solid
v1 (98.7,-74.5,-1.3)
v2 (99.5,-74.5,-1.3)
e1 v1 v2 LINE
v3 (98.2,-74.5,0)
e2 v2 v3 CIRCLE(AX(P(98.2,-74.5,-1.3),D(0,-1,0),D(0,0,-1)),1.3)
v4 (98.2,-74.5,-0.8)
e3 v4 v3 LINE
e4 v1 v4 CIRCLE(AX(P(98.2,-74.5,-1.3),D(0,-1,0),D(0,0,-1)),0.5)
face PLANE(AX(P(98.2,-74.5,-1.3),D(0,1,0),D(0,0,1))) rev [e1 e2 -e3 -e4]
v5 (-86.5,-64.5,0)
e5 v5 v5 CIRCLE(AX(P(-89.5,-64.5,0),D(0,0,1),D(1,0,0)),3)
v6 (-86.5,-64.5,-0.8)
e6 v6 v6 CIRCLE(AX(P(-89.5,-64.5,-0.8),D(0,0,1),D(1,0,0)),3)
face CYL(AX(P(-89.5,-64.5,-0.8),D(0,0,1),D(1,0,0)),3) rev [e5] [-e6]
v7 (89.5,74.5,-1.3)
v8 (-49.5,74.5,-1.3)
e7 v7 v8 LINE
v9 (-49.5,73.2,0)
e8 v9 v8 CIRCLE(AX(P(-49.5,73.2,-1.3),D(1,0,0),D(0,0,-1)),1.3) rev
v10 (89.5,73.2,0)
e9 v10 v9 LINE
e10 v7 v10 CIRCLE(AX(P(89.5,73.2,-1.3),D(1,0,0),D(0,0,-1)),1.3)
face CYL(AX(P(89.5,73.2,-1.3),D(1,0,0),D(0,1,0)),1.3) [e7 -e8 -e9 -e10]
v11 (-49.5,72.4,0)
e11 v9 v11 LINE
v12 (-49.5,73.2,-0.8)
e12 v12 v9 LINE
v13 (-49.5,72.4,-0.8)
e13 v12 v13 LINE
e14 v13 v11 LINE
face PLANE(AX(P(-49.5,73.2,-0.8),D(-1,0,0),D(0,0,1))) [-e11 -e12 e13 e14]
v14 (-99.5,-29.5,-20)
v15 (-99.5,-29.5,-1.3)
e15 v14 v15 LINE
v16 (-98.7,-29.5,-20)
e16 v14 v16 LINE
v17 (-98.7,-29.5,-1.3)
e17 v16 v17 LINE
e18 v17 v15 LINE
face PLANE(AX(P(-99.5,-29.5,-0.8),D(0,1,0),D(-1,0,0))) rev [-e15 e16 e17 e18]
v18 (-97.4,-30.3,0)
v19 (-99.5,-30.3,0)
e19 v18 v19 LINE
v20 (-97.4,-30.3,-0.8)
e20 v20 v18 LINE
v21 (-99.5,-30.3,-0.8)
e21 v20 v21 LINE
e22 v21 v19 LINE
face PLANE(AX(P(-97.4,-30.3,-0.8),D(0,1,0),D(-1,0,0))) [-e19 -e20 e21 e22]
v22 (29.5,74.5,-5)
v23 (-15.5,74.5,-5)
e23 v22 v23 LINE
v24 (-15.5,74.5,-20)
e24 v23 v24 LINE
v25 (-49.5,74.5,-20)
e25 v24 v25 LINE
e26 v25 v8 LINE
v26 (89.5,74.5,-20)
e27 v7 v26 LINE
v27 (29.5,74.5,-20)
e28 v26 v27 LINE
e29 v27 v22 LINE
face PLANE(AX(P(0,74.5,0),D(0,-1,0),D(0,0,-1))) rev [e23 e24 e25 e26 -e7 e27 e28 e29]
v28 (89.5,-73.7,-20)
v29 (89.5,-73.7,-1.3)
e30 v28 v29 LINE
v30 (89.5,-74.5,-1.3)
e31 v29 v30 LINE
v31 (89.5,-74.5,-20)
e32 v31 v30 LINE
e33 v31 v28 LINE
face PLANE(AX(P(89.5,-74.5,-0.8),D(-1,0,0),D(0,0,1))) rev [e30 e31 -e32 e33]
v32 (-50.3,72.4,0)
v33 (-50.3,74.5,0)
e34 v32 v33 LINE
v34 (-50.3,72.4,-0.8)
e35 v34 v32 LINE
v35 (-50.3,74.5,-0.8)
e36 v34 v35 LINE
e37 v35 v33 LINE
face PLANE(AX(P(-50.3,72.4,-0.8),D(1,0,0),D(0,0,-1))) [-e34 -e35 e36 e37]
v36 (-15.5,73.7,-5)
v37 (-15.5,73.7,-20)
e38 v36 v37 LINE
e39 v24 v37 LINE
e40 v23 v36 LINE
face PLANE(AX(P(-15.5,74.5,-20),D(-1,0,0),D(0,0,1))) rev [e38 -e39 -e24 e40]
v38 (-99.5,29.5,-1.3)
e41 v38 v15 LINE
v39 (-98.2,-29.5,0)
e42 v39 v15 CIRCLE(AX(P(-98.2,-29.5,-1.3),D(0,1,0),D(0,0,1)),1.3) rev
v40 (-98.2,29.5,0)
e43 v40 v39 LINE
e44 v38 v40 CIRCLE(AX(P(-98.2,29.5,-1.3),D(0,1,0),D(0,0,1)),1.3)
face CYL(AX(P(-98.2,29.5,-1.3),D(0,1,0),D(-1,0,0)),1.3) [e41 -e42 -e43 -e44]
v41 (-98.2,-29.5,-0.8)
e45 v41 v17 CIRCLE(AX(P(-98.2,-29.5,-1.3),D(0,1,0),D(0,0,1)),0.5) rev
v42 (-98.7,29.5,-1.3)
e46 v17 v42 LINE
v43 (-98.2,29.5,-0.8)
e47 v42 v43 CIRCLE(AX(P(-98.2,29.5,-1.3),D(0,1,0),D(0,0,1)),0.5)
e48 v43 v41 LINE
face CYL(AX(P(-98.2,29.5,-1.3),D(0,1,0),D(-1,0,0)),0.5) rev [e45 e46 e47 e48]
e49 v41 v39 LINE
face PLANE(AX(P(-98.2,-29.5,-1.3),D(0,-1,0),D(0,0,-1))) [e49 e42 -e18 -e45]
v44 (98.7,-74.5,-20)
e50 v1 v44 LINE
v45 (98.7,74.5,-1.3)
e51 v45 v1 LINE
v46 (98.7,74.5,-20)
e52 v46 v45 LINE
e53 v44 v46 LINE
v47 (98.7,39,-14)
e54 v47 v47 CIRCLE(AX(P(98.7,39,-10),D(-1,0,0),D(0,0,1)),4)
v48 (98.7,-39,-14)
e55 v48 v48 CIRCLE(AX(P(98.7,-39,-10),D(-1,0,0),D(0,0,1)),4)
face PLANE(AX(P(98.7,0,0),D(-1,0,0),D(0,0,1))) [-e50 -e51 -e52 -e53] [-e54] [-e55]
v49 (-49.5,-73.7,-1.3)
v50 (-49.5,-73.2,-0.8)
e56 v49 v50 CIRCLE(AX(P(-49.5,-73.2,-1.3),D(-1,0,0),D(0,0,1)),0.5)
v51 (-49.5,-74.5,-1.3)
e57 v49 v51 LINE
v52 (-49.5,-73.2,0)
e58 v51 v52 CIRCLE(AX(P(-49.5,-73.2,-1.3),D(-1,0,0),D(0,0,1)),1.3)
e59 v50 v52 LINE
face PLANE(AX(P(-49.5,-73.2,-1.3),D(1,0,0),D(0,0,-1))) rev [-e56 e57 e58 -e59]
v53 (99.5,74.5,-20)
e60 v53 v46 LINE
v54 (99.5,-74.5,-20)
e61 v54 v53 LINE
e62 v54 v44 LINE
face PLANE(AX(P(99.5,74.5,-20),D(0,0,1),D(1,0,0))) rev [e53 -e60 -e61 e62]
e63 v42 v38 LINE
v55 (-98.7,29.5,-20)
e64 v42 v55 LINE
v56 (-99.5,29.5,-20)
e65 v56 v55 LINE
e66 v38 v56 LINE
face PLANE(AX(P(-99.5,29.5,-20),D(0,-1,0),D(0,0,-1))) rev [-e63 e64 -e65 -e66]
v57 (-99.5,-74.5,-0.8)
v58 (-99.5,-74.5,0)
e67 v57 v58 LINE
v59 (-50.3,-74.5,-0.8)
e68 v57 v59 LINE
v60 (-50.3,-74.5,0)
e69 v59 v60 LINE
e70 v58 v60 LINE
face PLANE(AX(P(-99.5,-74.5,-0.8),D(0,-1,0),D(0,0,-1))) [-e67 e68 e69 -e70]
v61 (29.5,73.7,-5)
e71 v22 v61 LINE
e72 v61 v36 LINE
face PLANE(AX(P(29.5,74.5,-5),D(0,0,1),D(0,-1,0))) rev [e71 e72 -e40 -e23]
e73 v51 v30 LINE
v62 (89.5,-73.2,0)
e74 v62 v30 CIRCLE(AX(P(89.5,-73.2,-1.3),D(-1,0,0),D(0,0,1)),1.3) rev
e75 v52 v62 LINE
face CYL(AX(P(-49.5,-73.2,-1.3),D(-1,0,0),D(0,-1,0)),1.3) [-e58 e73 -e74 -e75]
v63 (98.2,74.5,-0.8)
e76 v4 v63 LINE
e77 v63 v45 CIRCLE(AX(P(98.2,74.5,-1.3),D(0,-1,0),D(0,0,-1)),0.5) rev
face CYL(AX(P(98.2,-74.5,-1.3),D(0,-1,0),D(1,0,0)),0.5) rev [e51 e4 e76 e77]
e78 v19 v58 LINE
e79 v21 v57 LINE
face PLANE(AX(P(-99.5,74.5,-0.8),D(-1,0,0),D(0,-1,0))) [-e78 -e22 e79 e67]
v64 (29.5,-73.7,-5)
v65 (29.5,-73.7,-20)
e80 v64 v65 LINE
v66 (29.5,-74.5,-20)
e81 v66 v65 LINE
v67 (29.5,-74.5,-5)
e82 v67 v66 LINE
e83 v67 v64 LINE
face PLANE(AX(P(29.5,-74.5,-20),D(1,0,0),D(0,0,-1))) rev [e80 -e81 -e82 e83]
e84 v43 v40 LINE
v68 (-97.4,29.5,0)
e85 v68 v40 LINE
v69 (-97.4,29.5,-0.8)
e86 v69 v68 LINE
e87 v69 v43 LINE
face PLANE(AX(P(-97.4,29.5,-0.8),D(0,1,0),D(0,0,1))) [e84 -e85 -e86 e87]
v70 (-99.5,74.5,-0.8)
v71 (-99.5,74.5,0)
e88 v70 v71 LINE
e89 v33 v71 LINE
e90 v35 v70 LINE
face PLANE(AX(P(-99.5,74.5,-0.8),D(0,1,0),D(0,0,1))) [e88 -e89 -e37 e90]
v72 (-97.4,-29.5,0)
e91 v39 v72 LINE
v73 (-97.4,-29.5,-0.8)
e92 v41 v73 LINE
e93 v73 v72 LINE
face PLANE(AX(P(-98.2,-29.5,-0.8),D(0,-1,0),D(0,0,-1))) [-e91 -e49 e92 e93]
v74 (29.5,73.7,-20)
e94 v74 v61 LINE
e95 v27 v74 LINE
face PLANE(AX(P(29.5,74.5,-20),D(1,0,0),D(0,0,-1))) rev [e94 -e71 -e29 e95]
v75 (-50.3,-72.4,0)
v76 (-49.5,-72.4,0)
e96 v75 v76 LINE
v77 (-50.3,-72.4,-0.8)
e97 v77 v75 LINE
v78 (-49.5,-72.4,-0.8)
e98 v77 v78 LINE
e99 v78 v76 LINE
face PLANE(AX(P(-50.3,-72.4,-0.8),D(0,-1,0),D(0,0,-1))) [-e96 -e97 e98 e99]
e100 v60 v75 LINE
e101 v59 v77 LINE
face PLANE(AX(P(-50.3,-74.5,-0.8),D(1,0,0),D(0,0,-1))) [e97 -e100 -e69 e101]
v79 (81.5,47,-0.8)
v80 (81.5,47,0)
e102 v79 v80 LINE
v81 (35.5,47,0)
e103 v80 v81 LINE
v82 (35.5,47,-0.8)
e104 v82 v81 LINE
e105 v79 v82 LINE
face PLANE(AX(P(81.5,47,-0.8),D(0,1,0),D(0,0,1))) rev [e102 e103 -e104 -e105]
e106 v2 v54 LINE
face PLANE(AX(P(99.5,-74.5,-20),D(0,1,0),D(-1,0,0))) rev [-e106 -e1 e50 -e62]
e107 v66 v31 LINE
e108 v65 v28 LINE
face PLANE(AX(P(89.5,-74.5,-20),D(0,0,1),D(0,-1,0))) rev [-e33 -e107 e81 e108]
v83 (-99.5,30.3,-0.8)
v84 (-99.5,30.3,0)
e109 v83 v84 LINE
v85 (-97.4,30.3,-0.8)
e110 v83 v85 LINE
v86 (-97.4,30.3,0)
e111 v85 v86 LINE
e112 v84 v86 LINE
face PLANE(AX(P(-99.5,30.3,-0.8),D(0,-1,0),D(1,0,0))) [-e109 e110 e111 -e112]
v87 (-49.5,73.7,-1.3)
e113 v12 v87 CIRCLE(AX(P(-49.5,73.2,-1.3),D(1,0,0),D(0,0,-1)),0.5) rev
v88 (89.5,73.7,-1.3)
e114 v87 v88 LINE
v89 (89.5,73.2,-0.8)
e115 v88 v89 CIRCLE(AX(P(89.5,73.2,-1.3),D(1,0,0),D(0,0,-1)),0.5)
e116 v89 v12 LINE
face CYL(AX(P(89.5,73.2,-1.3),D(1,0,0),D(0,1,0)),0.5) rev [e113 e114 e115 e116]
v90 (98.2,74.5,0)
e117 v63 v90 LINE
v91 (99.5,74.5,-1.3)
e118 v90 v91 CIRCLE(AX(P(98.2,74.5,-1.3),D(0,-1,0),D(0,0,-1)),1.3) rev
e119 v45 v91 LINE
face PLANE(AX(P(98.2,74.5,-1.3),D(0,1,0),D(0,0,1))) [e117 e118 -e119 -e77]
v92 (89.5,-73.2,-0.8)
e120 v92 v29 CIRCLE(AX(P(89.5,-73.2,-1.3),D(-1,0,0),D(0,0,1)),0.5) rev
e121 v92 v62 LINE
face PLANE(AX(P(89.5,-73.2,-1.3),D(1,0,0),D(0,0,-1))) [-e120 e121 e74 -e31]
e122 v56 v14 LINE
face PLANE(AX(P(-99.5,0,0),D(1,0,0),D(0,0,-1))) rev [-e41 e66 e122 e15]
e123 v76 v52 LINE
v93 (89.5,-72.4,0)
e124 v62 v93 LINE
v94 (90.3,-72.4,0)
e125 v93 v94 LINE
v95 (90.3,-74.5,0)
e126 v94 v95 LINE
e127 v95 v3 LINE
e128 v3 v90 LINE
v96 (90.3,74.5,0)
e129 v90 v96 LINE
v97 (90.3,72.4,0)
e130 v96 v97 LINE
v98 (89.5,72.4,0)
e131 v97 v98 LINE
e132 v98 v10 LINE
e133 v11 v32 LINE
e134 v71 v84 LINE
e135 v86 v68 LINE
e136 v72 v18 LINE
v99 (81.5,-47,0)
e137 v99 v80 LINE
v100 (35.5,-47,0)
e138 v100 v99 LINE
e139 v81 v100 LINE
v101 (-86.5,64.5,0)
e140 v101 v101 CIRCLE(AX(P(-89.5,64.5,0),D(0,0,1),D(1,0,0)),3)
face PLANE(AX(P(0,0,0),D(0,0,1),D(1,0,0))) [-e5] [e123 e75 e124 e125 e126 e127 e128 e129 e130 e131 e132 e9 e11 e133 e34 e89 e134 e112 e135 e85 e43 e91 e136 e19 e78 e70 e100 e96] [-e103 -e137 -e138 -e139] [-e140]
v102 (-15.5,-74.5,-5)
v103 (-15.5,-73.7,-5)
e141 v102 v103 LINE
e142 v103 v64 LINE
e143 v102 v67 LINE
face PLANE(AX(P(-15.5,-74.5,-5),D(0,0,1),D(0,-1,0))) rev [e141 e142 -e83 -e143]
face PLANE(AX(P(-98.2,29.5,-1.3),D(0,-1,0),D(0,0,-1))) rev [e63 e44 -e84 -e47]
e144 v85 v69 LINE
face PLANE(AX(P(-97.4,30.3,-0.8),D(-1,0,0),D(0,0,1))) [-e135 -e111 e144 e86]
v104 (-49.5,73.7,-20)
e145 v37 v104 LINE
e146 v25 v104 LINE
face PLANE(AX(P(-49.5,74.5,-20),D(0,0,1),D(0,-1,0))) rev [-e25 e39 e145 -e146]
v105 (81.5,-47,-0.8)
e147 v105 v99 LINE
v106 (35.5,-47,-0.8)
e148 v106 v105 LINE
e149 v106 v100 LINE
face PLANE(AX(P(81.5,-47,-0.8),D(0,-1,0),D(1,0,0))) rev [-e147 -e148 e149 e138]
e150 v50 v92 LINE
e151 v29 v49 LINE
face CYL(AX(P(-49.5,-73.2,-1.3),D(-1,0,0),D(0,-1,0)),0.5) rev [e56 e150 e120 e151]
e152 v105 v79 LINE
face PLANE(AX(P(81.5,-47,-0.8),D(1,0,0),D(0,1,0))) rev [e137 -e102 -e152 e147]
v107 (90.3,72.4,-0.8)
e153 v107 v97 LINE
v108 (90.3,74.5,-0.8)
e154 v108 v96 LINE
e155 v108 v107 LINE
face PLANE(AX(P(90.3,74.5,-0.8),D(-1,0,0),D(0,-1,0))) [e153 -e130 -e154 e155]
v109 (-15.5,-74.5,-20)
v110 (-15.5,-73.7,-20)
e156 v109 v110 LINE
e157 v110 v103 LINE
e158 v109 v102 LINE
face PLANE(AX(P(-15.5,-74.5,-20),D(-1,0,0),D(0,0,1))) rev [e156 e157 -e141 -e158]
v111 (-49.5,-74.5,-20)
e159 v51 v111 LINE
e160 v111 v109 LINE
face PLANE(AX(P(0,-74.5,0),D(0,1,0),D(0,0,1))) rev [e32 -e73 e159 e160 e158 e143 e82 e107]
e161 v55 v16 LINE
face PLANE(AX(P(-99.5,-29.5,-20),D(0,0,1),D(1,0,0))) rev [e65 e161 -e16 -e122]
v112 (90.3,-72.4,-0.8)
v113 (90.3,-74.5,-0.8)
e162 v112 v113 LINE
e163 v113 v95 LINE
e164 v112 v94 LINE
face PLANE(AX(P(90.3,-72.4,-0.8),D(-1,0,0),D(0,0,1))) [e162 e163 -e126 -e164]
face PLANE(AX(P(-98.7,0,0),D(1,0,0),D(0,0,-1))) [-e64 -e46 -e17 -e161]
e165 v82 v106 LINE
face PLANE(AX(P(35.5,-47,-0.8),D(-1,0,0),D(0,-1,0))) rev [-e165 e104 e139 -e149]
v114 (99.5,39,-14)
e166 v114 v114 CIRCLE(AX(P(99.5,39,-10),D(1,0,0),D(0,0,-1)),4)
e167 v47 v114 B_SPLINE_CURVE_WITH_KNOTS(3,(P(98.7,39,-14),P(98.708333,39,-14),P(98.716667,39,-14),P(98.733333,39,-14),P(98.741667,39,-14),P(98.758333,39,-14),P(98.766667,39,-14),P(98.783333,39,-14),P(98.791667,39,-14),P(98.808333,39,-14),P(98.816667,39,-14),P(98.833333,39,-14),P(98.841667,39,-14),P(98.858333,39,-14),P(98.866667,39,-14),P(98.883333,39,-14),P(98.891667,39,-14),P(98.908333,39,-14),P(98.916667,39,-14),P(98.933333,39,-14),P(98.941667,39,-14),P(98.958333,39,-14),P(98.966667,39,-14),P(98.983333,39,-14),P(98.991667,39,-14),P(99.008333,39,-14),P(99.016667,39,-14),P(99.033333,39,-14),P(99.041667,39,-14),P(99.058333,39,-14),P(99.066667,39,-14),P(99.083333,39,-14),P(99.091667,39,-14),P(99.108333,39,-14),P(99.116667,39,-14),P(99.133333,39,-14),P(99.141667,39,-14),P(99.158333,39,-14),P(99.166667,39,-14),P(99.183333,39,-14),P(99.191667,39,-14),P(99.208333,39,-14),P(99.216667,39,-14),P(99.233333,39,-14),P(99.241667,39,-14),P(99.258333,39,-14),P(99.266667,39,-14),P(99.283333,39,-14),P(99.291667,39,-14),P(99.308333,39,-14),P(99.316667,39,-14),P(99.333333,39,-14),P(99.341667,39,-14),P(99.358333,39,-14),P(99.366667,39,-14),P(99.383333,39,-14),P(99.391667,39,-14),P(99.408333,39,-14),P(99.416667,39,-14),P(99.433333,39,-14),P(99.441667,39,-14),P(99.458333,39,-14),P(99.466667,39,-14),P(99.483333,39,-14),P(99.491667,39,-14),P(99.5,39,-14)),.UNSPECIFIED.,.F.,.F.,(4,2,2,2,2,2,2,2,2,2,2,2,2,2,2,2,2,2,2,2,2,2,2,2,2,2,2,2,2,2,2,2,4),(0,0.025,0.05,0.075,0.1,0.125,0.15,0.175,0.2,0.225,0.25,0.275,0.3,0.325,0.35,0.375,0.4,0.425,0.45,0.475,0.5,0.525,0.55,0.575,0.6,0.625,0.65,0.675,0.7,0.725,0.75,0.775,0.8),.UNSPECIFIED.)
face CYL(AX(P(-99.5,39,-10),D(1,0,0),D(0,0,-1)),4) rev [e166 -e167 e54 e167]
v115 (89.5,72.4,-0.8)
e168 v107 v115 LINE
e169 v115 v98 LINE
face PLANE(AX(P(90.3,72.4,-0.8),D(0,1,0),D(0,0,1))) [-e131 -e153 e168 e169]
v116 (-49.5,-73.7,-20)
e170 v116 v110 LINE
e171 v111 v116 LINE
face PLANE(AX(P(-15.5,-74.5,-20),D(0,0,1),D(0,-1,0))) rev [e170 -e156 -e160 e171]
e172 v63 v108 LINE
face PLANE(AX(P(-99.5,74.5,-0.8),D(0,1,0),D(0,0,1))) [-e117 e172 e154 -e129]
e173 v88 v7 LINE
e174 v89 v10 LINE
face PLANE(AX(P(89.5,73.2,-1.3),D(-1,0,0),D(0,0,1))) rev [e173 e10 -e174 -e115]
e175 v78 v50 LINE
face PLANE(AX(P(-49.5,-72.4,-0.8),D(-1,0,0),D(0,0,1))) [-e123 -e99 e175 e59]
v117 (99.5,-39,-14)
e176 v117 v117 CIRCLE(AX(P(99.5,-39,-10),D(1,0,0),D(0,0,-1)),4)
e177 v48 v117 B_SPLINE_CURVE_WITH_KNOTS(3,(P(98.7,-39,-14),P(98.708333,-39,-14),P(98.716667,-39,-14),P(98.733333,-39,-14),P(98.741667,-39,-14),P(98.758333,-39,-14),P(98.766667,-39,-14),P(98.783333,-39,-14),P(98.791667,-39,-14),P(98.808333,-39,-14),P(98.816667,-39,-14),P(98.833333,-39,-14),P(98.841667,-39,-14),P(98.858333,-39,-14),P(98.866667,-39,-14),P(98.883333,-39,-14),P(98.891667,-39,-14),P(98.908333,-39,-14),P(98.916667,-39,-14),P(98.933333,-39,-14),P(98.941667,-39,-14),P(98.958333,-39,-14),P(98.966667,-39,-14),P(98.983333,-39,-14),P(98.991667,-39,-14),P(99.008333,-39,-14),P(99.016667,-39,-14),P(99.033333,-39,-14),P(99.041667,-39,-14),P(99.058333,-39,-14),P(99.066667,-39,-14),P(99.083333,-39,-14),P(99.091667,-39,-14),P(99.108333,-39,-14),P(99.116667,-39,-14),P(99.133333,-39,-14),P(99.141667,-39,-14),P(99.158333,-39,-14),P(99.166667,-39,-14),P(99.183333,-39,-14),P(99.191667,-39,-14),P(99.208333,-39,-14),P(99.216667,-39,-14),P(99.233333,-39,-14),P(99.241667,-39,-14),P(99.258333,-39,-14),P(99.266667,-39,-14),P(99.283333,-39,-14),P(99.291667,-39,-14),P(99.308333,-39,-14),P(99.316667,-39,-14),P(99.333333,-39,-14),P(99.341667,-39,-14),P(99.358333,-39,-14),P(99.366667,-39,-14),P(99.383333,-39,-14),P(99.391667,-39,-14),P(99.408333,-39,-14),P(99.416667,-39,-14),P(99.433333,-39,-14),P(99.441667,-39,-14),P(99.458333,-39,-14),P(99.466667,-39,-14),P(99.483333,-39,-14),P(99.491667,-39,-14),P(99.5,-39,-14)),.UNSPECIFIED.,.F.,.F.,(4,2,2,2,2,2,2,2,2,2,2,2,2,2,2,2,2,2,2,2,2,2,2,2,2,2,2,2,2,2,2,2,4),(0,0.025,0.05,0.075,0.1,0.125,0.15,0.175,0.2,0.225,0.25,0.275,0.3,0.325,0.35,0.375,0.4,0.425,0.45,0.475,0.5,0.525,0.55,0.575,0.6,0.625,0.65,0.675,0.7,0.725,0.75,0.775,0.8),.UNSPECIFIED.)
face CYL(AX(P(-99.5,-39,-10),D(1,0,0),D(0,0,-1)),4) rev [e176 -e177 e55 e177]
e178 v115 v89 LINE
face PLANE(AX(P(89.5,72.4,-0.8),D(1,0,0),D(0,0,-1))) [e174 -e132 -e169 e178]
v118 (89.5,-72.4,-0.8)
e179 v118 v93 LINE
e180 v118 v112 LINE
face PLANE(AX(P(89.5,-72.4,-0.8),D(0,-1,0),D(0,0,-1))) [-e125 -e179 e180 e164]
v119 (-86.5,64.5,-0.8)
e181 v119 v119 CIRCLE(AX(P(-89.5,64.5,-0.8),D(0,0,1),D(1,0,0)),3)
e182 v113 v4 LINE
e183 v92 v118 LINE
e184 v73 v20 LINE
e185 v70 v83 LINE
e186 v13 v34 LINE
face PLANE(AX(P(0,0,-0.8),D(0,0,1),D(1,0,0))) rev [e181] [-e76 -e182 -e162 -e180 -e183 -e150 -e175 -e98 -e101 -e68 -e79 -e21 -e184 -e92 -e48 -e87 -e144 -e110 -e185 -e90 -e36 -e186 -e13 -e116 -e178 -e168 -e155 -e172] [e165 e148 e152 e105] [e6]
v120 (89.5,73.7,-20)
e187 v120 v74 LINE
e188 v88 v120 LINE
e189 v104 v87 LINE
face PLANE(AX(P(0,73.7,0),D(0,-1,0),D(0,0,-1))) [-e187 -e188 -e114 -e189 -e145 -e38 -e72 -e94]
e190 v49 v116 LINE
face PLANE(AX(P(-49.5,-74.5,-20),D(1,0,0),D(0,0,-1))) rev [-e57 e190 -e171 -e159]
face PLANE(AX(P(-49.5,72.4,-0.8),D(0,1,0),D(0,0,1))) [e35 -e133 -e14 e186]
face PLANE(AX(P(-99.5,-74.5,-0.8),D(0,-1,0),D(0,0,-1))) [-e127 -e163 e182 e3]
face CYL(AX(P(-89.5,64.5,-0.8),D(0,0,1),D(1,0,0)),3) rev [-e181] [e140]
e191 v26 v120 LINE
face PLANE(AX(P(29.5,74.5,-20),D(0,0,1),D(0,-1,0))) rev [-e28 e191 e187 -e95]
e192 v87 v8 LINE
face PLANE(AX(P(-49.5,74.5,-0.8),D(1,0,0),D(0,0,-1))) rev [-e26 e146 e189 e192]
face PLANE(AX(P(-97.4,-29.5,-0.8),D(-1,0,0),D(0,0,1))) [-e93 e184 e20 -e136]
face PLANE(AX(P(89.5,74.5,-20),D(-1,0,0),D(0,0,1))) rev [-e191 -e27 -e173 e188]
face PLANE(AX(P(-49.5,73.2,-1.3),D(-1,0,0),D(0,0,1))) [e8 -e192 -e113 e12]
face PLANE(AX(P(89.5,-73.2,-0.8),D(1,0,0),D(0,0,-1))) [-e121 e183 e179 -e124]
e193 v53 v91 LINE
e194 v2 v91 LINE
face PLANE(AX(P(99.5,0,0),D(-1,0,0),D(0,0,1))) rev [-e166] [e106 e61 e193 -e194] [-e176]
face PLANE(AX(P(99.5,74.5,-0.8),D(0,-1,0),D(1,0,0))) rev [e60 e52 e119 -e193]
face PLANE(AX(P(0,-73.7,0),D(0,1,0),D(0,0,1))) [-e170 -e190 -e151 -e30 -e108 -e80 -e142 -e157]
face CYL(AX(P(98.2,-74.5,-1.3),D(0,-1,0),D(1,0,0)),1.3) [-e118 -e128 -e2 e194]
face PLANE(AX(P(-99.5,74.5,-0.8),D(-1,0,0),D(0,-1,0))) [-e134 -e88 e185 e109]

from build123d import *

# Parameters (mm, degrees)
SKETCH_1_W                        = 199
SKETCH_1_H                        = 149
SKETCH_1_R                        = 3
SKETCH_1_W_2                      = 46
SKETCH_1_H_2                      = 94
SM_BASE_FLANGE_1_DEPTH            = 0.8
SM_EDGE_FLANGE_1_STRIP_W          = 4.2
SM_EDGE_FLANGE_1_STRIP_H          = 0.8
SM_EDGE_FLANGE_1_STRIP_CUT_DEPTH  = 59
SM_EDGE_FLANGE_1_RELIEF_W         = 5
SM_EDGE_FLANGE_1_RELIEF_H         = 0.8
SM_EDGE_FLANGE_1_RELIEF_CUT_DEPTH = 0.8
SM_EDGE_FLANGE_1_DEPTH            = 59
SM_EDGE_FLANGE_3_STRIP_W          = 4.2
SM_EDGE_FLANGE_3_STRIP_H          = 0.8
SM_EDGE_FLANGE_3_STRIP_CUT_DEPTH  = 139
SM_EDGE_FLANGE_3_RELIEF_W         = 5
SM_EDGE_FLANGE_3_RELIEF_H         = 0.8
SM_EDGE_FLANGE_3_RELIEF_CUT_DEPTH = 0.8
SM_EDGE_FLANGE_3_DEPTH            = 139
SM_EDGE_FLANGE_3_FLAT_DEPTH       = 0.8
SM_EDGE_FLANGE_4_STRIP_W          = 4.2
SM_EDGE_FLANGE_4_STRIP_H          = 0.8
SM_EDGE_FLANGE_4_STRIP_CUT_DEPTH  = 139
SM_EDGE_FLANGE_4_RELIEF_W         = 5
SM_EDGE_FLANGE_4_RELIEF_H         = 0.8
SM_EDGE_FLANGE_4_RELIEF_CUT_DEPTH = 0.8
SM_EDGE_FLANGE_4_DEPTH            = 139
SM_EDGE_FLANGE_4_FLAT_DEPTH       = 0.8
SM_EDGE_FLANGE_5_STRIP_W          = 4.2
SM_EDGE_FLANGE_5_STRIP_H          = 0.8
SM_EDGE_FLANGE_5_STRIP_CUT_DEPTH  = 149
SM_EDGE_FLANGE_5_DEPTH            = 149
SKETCH_21_R                       = 4
CUT_EXTRUDE_1_DEPTH               = 214.427388121


# Sheet-metal steps are written as plain solids
with BuildPart() as part:
    # Sketch 1 → 基体-法兰1 (new body)
    with BuildSketch(Plane.XY):
        Rectangle(SKETCH_1_W, SKETCH_1_H)
        with Locations((-89.5, 64.5)):
            Circle(SKETCH_1_R, mode=Mode.SUBTRACT)
        with Locations((-89.5, -64.5)):
            Circle(SKETCH_1_R, mode=Mode.SUBTRACT)
        with Locations((58.5, 0)):
            Rectangle(SKETCH_1_W_2, SKETCH_1_H_2, mode=Mode.SUBTRACT)
    extrude(amount=-SM_BASE_FLANGE_1_DEPTH)

    # 边线-法兰1 strip (across the edge) → 边线-法兰1 strip cut (cut)
    with BuildSketch(Plane(origin=(-99.5, -29.5, -0.8), x_dir=(1, 0, 0), z_dir=(0, 1, 0))):
        with Locations((-0.8, -0.4)):
            Rectangle(SM_EDGE_FLANGE_1_STRIP_W, SM_EDGE_FLANGE_1_STRIP_H)
    extrude(amount=SM_EDGE_FLANGE_1_STRIP_CUT_DEPTH, mode=Mode.SUBTRACT)

    # 边线-法兰1 relief (on the sheet) → 边线-法兰1 relief cut (cut)
    with BuildSketch(Plane(origin=(-98.2, -29.5, -0.8), x_dir=(1, 0, 0), z_dir=(0, 0, -1))):
        with Locations((-1.7, 0.4)):
            Rectangle(SM_EDGE_FLANGE_1_RELIEF_W, SM_EDGE_FLANGE_1_RELIEF_H)
        with Locations((-1.7, -59.4)):
            Rectangle(SM_EDGE_FLANGE_1_RELIEF_W, SM_EDGE_FLANGE_1_RELIEF_H)
    extrude(amount=-SM_EDGE_FLANGE_1_RELIEF_CUT_DEPTH, mode=Mode.SUBTRACT)

    # 边线-法兰1 section (across the edge) → 边线-法兰1 (add)
    with BuildSketch(Plane(origin=(-99.5, -29.5, -0.8), x_dir=(1, 0, 0), z_dir=(0, 1, 0))):
        with BuildLine():
            Line((0, 0.5), (0, 19.2))
            Line((0, 19.2), (0.8, 19.2))
            Line((0.8, 19.2), (0.8, 0.5))
            ThreePointArc((0.8, 0.5), (0.946446609, 0.146446609), (1.3, 0))
            Line((1.3, 0), (1.3, -0.8))
            ThreePointArc((1.3, -0.8), (0.380761184, -0.419238816), (0, 0.5))
        make_face()
    extrude(amount=SM_EDGE_FLANGE_1_DEPTH)

    # 边线-法兰3 strip (across the edge) → 边线-法兰3 strip cut (cut)
    with BuildSketch(Plane(origin=(89.5, -74.5, -0.8), x_dir=(0, 1, 0), z_dir=(-1, 0, 0))):
        with Locations((-0.8, -0.4)):
            Rectangle(SM_EDGE_FLANGE_3_STRIP_W, SM_EDGE_FLANGE_3_STRIP_H)
    extrude(amount=SM_EDGE_FLANGE_3_STRIP_CUT_DEPTH, mode=Mode.SUBTRACT)

    # 边线-法兰3 relief (on the sheet) → 边线-法兰3 relief cut (cut)
    with BuildSketch(Plane(origin=(89.5, -73.2, -0.8), x_dir=(0, 1, 0), z_dir=(0, 0, -1))):
        with Locations((-1.7, 0.4)):
            Rectangle(SM_EDGE_FLANGE_3_RELIEF_W, SM_EDGE_FLANGE_3_RELIEF_H)
        with Locations((-1.7, -139.4)):
            Rectangle(SM_EDGE_FLANGE_3_RELIEF_W, SM_EDGE_FLANGE_3_RELIEF_H)
    extrude(amount=-SM_EDGE_FLANGE_3_RELIEF_CUT_DEPTH, mode=Mode.SUBTRACT)

    # 边线-法兰3 bend section (across the edge) → 边线-法兰3 (add)
    with BuildSketch(Plane(origin=(89.5, -74.5, -0.8), x_dir=(0, 1, 0), z_dir=(-1, 0, 0))):
        with BuildLine():
            Line((0, 0.5), (0.8, 0.5))
            ThreePointArc((0.8, 0.5), (0.946446609, 0.146446609), (1.3, 0))
            Line((1.3, 0), (1.3, -0.8))
            ThreePointArc((1.3, -0.8), (0.380761184, -0.419238816), (0, 0.5))
        make_face()
    extrude(amount=SM_EDGE_FLANGE_3_DEPTH)

    # 边线-法兰3 profile (on flange) → 边线-法兰3 flat (add)
    with BuildSketch(Plane(origin=(0, -74.5, -0.8), x_dir=(-1, 0, 0), z_dir=(0, -1, 0))):
        Polygon((49.5, 0.5), (49.5, 19.2), (15.5, 19.2), (15.5, 4.2), (-29.5, 4.2), (-29.5, 19.2), (-89.5, 19.2), (-89.5, 0.5), align=None)
    extrude(amount=-SM_EDGE_FLANGE_3_FLAT_DEPTH)

    # 边线-法兰4 strip (across the edge) → 边线-法兰4 strip cut (cut)
    with BuildSketch(Plane(origin=(-49.5, 74.5, -0.8), x_dir=(0, -1, 0), z_dir=(1, 0, 0))):
        with Locations((-0.8, -0.4)):
            Rectangle(SM_EDGE_FLANGE_4_STRIP_W, SM_EDGE_FLANGE_4_STRIP_H)
    extrude(amount=SM_EDGE_FLANGE_4_STRIP_CUT_DEPTH, mode=Mode.SUBTRACT)

    # 边线-法兰4 relief (on the sheet) → 边线-法兰4 relief cut (cut)
    with BuildSketch(Plane(origin=(-49.5, 73.2, -0.8), x_dir=(0, -1, 0), z_dir=(0, 0, -1))):
        with Locations((-1.7, 0.4)):
            Rectangle(SM_EDGE_FLANGE_4_RELIEF_W, SM_EDGE_FLANGE_4_RELIEF_H)
        with Locations((-1.7, -139.4)):
            Rectangle(SM_EDGE_FLANGE_4_RELIEF_W, SM_EDGE_FLANGE_4_RELIEF_H)
    extrude(amount=-SM_EDGE_FLANGE_4_RELIEF_CUT_DEPTH, mode=Mode.SUBTRACT)

    # 边线-法兰4 bend section (across the edge) → 边线-法兰4 (add)
    with BuildSketch(Plane(origin=(-49.5, 74.5, -0.8), x_dir=(0, -1, 0), z_dir=(1, 0, 0))):
        with BuildLine():
            Line((0, 0.5), (0.8, 0.5))
            ThreePointArc((0.8, 0.5), (0.946446609, 0.146446609), (1.3, 0))
            Line((1.3, 0), (1.3, -0.8))
            ThreePointArc((1.3, -0.8), (0.380761184, -0.419238816), (0, 0.5))
        make_face()
    extrude(amount=SM_EDGE_FLANGE_4_DEPTH)

    # 边线-法兰4 profile (on flange) → 边线-法兰4 flat (add)
    with BuildSketch(Plane(origin=(0, 74.5, -0.8), x_dir=(1, 0, 0), z_dir=(0, 1, 0))):
        Polygon((89.5, 0.5), (89.5, 19.2), (29.5, 19.2), (29.5, 4.2), (-15.5, 4.2), (-15.5, 19.2), (-49.5, 19.2), (-49.5, 0.5), align=None)
    extrude(amount=-SM_EDGE_FLANGE_4_FLAT_DEPTH)

    # 边线-法兰5 strip (across the edge) → 边线-法兰5 strip cut (cut)
    with BuildSketch(Plane(origin=(99.5, 74.5, -0.8), x_dir=(-1, 0, 0), z_dir=(0, -1, 0))):
        with Locations((-0.8, -0.4)):
            Rectangle(SM_EDGE_FLANGE_5_STRIP_W, SM_EDGE_FLANGE_5_STRIP_H)
    extrude(amount=SM_EDGE_FLANGE_5_STRIP_CUT_DEPTH, mode=Mode.SUBTRACT)

    # 边线-法兰5 section (across the edge) → 边线-法兰5 (add)
    with BuildSketch(Plane(origin=(99.5, 74.5, -0.8), x_dir=(-1, 0, 0), z_dir=(0, -1, 0))):
        with BuildLine():
            Line((0, 0.5), (0, 19.2))
            Line((0, 19.2), (0.8, 19.2))
            Line((0.8, 19.2), (0.8, 0.5))
            ThreePointArc((0.8, 0.5), (0.946446609, 0.146446609), (1.3, 0))
            Line((1.3, 0), (1.3, -0.8))
            ThreePointArc((1.3, -0.8), (0.380761184, -0.419238816), (0, 0.5))
        make_face()
    extrude(amount=SM_EDGE_FLANGE_5_DEPTH)

    # 草图21 → 切除-拉伸1 (cut, through all)
    with BuildSketch(Plane(origin=(99.5, 0, 0), x_dir=(0, 0, -1), z_dir=(1, 0, 0))):
        with Locations((10, -39)):
            Circle(SKETCH_21_R)
        with Locations((10, 39)):
            Circle(SKETCH_21_R)
    extrude(amount=-CUT_EXTRUDE_1_DEPTH, mode=Mode.SUBTRACT)


solid = part.part
